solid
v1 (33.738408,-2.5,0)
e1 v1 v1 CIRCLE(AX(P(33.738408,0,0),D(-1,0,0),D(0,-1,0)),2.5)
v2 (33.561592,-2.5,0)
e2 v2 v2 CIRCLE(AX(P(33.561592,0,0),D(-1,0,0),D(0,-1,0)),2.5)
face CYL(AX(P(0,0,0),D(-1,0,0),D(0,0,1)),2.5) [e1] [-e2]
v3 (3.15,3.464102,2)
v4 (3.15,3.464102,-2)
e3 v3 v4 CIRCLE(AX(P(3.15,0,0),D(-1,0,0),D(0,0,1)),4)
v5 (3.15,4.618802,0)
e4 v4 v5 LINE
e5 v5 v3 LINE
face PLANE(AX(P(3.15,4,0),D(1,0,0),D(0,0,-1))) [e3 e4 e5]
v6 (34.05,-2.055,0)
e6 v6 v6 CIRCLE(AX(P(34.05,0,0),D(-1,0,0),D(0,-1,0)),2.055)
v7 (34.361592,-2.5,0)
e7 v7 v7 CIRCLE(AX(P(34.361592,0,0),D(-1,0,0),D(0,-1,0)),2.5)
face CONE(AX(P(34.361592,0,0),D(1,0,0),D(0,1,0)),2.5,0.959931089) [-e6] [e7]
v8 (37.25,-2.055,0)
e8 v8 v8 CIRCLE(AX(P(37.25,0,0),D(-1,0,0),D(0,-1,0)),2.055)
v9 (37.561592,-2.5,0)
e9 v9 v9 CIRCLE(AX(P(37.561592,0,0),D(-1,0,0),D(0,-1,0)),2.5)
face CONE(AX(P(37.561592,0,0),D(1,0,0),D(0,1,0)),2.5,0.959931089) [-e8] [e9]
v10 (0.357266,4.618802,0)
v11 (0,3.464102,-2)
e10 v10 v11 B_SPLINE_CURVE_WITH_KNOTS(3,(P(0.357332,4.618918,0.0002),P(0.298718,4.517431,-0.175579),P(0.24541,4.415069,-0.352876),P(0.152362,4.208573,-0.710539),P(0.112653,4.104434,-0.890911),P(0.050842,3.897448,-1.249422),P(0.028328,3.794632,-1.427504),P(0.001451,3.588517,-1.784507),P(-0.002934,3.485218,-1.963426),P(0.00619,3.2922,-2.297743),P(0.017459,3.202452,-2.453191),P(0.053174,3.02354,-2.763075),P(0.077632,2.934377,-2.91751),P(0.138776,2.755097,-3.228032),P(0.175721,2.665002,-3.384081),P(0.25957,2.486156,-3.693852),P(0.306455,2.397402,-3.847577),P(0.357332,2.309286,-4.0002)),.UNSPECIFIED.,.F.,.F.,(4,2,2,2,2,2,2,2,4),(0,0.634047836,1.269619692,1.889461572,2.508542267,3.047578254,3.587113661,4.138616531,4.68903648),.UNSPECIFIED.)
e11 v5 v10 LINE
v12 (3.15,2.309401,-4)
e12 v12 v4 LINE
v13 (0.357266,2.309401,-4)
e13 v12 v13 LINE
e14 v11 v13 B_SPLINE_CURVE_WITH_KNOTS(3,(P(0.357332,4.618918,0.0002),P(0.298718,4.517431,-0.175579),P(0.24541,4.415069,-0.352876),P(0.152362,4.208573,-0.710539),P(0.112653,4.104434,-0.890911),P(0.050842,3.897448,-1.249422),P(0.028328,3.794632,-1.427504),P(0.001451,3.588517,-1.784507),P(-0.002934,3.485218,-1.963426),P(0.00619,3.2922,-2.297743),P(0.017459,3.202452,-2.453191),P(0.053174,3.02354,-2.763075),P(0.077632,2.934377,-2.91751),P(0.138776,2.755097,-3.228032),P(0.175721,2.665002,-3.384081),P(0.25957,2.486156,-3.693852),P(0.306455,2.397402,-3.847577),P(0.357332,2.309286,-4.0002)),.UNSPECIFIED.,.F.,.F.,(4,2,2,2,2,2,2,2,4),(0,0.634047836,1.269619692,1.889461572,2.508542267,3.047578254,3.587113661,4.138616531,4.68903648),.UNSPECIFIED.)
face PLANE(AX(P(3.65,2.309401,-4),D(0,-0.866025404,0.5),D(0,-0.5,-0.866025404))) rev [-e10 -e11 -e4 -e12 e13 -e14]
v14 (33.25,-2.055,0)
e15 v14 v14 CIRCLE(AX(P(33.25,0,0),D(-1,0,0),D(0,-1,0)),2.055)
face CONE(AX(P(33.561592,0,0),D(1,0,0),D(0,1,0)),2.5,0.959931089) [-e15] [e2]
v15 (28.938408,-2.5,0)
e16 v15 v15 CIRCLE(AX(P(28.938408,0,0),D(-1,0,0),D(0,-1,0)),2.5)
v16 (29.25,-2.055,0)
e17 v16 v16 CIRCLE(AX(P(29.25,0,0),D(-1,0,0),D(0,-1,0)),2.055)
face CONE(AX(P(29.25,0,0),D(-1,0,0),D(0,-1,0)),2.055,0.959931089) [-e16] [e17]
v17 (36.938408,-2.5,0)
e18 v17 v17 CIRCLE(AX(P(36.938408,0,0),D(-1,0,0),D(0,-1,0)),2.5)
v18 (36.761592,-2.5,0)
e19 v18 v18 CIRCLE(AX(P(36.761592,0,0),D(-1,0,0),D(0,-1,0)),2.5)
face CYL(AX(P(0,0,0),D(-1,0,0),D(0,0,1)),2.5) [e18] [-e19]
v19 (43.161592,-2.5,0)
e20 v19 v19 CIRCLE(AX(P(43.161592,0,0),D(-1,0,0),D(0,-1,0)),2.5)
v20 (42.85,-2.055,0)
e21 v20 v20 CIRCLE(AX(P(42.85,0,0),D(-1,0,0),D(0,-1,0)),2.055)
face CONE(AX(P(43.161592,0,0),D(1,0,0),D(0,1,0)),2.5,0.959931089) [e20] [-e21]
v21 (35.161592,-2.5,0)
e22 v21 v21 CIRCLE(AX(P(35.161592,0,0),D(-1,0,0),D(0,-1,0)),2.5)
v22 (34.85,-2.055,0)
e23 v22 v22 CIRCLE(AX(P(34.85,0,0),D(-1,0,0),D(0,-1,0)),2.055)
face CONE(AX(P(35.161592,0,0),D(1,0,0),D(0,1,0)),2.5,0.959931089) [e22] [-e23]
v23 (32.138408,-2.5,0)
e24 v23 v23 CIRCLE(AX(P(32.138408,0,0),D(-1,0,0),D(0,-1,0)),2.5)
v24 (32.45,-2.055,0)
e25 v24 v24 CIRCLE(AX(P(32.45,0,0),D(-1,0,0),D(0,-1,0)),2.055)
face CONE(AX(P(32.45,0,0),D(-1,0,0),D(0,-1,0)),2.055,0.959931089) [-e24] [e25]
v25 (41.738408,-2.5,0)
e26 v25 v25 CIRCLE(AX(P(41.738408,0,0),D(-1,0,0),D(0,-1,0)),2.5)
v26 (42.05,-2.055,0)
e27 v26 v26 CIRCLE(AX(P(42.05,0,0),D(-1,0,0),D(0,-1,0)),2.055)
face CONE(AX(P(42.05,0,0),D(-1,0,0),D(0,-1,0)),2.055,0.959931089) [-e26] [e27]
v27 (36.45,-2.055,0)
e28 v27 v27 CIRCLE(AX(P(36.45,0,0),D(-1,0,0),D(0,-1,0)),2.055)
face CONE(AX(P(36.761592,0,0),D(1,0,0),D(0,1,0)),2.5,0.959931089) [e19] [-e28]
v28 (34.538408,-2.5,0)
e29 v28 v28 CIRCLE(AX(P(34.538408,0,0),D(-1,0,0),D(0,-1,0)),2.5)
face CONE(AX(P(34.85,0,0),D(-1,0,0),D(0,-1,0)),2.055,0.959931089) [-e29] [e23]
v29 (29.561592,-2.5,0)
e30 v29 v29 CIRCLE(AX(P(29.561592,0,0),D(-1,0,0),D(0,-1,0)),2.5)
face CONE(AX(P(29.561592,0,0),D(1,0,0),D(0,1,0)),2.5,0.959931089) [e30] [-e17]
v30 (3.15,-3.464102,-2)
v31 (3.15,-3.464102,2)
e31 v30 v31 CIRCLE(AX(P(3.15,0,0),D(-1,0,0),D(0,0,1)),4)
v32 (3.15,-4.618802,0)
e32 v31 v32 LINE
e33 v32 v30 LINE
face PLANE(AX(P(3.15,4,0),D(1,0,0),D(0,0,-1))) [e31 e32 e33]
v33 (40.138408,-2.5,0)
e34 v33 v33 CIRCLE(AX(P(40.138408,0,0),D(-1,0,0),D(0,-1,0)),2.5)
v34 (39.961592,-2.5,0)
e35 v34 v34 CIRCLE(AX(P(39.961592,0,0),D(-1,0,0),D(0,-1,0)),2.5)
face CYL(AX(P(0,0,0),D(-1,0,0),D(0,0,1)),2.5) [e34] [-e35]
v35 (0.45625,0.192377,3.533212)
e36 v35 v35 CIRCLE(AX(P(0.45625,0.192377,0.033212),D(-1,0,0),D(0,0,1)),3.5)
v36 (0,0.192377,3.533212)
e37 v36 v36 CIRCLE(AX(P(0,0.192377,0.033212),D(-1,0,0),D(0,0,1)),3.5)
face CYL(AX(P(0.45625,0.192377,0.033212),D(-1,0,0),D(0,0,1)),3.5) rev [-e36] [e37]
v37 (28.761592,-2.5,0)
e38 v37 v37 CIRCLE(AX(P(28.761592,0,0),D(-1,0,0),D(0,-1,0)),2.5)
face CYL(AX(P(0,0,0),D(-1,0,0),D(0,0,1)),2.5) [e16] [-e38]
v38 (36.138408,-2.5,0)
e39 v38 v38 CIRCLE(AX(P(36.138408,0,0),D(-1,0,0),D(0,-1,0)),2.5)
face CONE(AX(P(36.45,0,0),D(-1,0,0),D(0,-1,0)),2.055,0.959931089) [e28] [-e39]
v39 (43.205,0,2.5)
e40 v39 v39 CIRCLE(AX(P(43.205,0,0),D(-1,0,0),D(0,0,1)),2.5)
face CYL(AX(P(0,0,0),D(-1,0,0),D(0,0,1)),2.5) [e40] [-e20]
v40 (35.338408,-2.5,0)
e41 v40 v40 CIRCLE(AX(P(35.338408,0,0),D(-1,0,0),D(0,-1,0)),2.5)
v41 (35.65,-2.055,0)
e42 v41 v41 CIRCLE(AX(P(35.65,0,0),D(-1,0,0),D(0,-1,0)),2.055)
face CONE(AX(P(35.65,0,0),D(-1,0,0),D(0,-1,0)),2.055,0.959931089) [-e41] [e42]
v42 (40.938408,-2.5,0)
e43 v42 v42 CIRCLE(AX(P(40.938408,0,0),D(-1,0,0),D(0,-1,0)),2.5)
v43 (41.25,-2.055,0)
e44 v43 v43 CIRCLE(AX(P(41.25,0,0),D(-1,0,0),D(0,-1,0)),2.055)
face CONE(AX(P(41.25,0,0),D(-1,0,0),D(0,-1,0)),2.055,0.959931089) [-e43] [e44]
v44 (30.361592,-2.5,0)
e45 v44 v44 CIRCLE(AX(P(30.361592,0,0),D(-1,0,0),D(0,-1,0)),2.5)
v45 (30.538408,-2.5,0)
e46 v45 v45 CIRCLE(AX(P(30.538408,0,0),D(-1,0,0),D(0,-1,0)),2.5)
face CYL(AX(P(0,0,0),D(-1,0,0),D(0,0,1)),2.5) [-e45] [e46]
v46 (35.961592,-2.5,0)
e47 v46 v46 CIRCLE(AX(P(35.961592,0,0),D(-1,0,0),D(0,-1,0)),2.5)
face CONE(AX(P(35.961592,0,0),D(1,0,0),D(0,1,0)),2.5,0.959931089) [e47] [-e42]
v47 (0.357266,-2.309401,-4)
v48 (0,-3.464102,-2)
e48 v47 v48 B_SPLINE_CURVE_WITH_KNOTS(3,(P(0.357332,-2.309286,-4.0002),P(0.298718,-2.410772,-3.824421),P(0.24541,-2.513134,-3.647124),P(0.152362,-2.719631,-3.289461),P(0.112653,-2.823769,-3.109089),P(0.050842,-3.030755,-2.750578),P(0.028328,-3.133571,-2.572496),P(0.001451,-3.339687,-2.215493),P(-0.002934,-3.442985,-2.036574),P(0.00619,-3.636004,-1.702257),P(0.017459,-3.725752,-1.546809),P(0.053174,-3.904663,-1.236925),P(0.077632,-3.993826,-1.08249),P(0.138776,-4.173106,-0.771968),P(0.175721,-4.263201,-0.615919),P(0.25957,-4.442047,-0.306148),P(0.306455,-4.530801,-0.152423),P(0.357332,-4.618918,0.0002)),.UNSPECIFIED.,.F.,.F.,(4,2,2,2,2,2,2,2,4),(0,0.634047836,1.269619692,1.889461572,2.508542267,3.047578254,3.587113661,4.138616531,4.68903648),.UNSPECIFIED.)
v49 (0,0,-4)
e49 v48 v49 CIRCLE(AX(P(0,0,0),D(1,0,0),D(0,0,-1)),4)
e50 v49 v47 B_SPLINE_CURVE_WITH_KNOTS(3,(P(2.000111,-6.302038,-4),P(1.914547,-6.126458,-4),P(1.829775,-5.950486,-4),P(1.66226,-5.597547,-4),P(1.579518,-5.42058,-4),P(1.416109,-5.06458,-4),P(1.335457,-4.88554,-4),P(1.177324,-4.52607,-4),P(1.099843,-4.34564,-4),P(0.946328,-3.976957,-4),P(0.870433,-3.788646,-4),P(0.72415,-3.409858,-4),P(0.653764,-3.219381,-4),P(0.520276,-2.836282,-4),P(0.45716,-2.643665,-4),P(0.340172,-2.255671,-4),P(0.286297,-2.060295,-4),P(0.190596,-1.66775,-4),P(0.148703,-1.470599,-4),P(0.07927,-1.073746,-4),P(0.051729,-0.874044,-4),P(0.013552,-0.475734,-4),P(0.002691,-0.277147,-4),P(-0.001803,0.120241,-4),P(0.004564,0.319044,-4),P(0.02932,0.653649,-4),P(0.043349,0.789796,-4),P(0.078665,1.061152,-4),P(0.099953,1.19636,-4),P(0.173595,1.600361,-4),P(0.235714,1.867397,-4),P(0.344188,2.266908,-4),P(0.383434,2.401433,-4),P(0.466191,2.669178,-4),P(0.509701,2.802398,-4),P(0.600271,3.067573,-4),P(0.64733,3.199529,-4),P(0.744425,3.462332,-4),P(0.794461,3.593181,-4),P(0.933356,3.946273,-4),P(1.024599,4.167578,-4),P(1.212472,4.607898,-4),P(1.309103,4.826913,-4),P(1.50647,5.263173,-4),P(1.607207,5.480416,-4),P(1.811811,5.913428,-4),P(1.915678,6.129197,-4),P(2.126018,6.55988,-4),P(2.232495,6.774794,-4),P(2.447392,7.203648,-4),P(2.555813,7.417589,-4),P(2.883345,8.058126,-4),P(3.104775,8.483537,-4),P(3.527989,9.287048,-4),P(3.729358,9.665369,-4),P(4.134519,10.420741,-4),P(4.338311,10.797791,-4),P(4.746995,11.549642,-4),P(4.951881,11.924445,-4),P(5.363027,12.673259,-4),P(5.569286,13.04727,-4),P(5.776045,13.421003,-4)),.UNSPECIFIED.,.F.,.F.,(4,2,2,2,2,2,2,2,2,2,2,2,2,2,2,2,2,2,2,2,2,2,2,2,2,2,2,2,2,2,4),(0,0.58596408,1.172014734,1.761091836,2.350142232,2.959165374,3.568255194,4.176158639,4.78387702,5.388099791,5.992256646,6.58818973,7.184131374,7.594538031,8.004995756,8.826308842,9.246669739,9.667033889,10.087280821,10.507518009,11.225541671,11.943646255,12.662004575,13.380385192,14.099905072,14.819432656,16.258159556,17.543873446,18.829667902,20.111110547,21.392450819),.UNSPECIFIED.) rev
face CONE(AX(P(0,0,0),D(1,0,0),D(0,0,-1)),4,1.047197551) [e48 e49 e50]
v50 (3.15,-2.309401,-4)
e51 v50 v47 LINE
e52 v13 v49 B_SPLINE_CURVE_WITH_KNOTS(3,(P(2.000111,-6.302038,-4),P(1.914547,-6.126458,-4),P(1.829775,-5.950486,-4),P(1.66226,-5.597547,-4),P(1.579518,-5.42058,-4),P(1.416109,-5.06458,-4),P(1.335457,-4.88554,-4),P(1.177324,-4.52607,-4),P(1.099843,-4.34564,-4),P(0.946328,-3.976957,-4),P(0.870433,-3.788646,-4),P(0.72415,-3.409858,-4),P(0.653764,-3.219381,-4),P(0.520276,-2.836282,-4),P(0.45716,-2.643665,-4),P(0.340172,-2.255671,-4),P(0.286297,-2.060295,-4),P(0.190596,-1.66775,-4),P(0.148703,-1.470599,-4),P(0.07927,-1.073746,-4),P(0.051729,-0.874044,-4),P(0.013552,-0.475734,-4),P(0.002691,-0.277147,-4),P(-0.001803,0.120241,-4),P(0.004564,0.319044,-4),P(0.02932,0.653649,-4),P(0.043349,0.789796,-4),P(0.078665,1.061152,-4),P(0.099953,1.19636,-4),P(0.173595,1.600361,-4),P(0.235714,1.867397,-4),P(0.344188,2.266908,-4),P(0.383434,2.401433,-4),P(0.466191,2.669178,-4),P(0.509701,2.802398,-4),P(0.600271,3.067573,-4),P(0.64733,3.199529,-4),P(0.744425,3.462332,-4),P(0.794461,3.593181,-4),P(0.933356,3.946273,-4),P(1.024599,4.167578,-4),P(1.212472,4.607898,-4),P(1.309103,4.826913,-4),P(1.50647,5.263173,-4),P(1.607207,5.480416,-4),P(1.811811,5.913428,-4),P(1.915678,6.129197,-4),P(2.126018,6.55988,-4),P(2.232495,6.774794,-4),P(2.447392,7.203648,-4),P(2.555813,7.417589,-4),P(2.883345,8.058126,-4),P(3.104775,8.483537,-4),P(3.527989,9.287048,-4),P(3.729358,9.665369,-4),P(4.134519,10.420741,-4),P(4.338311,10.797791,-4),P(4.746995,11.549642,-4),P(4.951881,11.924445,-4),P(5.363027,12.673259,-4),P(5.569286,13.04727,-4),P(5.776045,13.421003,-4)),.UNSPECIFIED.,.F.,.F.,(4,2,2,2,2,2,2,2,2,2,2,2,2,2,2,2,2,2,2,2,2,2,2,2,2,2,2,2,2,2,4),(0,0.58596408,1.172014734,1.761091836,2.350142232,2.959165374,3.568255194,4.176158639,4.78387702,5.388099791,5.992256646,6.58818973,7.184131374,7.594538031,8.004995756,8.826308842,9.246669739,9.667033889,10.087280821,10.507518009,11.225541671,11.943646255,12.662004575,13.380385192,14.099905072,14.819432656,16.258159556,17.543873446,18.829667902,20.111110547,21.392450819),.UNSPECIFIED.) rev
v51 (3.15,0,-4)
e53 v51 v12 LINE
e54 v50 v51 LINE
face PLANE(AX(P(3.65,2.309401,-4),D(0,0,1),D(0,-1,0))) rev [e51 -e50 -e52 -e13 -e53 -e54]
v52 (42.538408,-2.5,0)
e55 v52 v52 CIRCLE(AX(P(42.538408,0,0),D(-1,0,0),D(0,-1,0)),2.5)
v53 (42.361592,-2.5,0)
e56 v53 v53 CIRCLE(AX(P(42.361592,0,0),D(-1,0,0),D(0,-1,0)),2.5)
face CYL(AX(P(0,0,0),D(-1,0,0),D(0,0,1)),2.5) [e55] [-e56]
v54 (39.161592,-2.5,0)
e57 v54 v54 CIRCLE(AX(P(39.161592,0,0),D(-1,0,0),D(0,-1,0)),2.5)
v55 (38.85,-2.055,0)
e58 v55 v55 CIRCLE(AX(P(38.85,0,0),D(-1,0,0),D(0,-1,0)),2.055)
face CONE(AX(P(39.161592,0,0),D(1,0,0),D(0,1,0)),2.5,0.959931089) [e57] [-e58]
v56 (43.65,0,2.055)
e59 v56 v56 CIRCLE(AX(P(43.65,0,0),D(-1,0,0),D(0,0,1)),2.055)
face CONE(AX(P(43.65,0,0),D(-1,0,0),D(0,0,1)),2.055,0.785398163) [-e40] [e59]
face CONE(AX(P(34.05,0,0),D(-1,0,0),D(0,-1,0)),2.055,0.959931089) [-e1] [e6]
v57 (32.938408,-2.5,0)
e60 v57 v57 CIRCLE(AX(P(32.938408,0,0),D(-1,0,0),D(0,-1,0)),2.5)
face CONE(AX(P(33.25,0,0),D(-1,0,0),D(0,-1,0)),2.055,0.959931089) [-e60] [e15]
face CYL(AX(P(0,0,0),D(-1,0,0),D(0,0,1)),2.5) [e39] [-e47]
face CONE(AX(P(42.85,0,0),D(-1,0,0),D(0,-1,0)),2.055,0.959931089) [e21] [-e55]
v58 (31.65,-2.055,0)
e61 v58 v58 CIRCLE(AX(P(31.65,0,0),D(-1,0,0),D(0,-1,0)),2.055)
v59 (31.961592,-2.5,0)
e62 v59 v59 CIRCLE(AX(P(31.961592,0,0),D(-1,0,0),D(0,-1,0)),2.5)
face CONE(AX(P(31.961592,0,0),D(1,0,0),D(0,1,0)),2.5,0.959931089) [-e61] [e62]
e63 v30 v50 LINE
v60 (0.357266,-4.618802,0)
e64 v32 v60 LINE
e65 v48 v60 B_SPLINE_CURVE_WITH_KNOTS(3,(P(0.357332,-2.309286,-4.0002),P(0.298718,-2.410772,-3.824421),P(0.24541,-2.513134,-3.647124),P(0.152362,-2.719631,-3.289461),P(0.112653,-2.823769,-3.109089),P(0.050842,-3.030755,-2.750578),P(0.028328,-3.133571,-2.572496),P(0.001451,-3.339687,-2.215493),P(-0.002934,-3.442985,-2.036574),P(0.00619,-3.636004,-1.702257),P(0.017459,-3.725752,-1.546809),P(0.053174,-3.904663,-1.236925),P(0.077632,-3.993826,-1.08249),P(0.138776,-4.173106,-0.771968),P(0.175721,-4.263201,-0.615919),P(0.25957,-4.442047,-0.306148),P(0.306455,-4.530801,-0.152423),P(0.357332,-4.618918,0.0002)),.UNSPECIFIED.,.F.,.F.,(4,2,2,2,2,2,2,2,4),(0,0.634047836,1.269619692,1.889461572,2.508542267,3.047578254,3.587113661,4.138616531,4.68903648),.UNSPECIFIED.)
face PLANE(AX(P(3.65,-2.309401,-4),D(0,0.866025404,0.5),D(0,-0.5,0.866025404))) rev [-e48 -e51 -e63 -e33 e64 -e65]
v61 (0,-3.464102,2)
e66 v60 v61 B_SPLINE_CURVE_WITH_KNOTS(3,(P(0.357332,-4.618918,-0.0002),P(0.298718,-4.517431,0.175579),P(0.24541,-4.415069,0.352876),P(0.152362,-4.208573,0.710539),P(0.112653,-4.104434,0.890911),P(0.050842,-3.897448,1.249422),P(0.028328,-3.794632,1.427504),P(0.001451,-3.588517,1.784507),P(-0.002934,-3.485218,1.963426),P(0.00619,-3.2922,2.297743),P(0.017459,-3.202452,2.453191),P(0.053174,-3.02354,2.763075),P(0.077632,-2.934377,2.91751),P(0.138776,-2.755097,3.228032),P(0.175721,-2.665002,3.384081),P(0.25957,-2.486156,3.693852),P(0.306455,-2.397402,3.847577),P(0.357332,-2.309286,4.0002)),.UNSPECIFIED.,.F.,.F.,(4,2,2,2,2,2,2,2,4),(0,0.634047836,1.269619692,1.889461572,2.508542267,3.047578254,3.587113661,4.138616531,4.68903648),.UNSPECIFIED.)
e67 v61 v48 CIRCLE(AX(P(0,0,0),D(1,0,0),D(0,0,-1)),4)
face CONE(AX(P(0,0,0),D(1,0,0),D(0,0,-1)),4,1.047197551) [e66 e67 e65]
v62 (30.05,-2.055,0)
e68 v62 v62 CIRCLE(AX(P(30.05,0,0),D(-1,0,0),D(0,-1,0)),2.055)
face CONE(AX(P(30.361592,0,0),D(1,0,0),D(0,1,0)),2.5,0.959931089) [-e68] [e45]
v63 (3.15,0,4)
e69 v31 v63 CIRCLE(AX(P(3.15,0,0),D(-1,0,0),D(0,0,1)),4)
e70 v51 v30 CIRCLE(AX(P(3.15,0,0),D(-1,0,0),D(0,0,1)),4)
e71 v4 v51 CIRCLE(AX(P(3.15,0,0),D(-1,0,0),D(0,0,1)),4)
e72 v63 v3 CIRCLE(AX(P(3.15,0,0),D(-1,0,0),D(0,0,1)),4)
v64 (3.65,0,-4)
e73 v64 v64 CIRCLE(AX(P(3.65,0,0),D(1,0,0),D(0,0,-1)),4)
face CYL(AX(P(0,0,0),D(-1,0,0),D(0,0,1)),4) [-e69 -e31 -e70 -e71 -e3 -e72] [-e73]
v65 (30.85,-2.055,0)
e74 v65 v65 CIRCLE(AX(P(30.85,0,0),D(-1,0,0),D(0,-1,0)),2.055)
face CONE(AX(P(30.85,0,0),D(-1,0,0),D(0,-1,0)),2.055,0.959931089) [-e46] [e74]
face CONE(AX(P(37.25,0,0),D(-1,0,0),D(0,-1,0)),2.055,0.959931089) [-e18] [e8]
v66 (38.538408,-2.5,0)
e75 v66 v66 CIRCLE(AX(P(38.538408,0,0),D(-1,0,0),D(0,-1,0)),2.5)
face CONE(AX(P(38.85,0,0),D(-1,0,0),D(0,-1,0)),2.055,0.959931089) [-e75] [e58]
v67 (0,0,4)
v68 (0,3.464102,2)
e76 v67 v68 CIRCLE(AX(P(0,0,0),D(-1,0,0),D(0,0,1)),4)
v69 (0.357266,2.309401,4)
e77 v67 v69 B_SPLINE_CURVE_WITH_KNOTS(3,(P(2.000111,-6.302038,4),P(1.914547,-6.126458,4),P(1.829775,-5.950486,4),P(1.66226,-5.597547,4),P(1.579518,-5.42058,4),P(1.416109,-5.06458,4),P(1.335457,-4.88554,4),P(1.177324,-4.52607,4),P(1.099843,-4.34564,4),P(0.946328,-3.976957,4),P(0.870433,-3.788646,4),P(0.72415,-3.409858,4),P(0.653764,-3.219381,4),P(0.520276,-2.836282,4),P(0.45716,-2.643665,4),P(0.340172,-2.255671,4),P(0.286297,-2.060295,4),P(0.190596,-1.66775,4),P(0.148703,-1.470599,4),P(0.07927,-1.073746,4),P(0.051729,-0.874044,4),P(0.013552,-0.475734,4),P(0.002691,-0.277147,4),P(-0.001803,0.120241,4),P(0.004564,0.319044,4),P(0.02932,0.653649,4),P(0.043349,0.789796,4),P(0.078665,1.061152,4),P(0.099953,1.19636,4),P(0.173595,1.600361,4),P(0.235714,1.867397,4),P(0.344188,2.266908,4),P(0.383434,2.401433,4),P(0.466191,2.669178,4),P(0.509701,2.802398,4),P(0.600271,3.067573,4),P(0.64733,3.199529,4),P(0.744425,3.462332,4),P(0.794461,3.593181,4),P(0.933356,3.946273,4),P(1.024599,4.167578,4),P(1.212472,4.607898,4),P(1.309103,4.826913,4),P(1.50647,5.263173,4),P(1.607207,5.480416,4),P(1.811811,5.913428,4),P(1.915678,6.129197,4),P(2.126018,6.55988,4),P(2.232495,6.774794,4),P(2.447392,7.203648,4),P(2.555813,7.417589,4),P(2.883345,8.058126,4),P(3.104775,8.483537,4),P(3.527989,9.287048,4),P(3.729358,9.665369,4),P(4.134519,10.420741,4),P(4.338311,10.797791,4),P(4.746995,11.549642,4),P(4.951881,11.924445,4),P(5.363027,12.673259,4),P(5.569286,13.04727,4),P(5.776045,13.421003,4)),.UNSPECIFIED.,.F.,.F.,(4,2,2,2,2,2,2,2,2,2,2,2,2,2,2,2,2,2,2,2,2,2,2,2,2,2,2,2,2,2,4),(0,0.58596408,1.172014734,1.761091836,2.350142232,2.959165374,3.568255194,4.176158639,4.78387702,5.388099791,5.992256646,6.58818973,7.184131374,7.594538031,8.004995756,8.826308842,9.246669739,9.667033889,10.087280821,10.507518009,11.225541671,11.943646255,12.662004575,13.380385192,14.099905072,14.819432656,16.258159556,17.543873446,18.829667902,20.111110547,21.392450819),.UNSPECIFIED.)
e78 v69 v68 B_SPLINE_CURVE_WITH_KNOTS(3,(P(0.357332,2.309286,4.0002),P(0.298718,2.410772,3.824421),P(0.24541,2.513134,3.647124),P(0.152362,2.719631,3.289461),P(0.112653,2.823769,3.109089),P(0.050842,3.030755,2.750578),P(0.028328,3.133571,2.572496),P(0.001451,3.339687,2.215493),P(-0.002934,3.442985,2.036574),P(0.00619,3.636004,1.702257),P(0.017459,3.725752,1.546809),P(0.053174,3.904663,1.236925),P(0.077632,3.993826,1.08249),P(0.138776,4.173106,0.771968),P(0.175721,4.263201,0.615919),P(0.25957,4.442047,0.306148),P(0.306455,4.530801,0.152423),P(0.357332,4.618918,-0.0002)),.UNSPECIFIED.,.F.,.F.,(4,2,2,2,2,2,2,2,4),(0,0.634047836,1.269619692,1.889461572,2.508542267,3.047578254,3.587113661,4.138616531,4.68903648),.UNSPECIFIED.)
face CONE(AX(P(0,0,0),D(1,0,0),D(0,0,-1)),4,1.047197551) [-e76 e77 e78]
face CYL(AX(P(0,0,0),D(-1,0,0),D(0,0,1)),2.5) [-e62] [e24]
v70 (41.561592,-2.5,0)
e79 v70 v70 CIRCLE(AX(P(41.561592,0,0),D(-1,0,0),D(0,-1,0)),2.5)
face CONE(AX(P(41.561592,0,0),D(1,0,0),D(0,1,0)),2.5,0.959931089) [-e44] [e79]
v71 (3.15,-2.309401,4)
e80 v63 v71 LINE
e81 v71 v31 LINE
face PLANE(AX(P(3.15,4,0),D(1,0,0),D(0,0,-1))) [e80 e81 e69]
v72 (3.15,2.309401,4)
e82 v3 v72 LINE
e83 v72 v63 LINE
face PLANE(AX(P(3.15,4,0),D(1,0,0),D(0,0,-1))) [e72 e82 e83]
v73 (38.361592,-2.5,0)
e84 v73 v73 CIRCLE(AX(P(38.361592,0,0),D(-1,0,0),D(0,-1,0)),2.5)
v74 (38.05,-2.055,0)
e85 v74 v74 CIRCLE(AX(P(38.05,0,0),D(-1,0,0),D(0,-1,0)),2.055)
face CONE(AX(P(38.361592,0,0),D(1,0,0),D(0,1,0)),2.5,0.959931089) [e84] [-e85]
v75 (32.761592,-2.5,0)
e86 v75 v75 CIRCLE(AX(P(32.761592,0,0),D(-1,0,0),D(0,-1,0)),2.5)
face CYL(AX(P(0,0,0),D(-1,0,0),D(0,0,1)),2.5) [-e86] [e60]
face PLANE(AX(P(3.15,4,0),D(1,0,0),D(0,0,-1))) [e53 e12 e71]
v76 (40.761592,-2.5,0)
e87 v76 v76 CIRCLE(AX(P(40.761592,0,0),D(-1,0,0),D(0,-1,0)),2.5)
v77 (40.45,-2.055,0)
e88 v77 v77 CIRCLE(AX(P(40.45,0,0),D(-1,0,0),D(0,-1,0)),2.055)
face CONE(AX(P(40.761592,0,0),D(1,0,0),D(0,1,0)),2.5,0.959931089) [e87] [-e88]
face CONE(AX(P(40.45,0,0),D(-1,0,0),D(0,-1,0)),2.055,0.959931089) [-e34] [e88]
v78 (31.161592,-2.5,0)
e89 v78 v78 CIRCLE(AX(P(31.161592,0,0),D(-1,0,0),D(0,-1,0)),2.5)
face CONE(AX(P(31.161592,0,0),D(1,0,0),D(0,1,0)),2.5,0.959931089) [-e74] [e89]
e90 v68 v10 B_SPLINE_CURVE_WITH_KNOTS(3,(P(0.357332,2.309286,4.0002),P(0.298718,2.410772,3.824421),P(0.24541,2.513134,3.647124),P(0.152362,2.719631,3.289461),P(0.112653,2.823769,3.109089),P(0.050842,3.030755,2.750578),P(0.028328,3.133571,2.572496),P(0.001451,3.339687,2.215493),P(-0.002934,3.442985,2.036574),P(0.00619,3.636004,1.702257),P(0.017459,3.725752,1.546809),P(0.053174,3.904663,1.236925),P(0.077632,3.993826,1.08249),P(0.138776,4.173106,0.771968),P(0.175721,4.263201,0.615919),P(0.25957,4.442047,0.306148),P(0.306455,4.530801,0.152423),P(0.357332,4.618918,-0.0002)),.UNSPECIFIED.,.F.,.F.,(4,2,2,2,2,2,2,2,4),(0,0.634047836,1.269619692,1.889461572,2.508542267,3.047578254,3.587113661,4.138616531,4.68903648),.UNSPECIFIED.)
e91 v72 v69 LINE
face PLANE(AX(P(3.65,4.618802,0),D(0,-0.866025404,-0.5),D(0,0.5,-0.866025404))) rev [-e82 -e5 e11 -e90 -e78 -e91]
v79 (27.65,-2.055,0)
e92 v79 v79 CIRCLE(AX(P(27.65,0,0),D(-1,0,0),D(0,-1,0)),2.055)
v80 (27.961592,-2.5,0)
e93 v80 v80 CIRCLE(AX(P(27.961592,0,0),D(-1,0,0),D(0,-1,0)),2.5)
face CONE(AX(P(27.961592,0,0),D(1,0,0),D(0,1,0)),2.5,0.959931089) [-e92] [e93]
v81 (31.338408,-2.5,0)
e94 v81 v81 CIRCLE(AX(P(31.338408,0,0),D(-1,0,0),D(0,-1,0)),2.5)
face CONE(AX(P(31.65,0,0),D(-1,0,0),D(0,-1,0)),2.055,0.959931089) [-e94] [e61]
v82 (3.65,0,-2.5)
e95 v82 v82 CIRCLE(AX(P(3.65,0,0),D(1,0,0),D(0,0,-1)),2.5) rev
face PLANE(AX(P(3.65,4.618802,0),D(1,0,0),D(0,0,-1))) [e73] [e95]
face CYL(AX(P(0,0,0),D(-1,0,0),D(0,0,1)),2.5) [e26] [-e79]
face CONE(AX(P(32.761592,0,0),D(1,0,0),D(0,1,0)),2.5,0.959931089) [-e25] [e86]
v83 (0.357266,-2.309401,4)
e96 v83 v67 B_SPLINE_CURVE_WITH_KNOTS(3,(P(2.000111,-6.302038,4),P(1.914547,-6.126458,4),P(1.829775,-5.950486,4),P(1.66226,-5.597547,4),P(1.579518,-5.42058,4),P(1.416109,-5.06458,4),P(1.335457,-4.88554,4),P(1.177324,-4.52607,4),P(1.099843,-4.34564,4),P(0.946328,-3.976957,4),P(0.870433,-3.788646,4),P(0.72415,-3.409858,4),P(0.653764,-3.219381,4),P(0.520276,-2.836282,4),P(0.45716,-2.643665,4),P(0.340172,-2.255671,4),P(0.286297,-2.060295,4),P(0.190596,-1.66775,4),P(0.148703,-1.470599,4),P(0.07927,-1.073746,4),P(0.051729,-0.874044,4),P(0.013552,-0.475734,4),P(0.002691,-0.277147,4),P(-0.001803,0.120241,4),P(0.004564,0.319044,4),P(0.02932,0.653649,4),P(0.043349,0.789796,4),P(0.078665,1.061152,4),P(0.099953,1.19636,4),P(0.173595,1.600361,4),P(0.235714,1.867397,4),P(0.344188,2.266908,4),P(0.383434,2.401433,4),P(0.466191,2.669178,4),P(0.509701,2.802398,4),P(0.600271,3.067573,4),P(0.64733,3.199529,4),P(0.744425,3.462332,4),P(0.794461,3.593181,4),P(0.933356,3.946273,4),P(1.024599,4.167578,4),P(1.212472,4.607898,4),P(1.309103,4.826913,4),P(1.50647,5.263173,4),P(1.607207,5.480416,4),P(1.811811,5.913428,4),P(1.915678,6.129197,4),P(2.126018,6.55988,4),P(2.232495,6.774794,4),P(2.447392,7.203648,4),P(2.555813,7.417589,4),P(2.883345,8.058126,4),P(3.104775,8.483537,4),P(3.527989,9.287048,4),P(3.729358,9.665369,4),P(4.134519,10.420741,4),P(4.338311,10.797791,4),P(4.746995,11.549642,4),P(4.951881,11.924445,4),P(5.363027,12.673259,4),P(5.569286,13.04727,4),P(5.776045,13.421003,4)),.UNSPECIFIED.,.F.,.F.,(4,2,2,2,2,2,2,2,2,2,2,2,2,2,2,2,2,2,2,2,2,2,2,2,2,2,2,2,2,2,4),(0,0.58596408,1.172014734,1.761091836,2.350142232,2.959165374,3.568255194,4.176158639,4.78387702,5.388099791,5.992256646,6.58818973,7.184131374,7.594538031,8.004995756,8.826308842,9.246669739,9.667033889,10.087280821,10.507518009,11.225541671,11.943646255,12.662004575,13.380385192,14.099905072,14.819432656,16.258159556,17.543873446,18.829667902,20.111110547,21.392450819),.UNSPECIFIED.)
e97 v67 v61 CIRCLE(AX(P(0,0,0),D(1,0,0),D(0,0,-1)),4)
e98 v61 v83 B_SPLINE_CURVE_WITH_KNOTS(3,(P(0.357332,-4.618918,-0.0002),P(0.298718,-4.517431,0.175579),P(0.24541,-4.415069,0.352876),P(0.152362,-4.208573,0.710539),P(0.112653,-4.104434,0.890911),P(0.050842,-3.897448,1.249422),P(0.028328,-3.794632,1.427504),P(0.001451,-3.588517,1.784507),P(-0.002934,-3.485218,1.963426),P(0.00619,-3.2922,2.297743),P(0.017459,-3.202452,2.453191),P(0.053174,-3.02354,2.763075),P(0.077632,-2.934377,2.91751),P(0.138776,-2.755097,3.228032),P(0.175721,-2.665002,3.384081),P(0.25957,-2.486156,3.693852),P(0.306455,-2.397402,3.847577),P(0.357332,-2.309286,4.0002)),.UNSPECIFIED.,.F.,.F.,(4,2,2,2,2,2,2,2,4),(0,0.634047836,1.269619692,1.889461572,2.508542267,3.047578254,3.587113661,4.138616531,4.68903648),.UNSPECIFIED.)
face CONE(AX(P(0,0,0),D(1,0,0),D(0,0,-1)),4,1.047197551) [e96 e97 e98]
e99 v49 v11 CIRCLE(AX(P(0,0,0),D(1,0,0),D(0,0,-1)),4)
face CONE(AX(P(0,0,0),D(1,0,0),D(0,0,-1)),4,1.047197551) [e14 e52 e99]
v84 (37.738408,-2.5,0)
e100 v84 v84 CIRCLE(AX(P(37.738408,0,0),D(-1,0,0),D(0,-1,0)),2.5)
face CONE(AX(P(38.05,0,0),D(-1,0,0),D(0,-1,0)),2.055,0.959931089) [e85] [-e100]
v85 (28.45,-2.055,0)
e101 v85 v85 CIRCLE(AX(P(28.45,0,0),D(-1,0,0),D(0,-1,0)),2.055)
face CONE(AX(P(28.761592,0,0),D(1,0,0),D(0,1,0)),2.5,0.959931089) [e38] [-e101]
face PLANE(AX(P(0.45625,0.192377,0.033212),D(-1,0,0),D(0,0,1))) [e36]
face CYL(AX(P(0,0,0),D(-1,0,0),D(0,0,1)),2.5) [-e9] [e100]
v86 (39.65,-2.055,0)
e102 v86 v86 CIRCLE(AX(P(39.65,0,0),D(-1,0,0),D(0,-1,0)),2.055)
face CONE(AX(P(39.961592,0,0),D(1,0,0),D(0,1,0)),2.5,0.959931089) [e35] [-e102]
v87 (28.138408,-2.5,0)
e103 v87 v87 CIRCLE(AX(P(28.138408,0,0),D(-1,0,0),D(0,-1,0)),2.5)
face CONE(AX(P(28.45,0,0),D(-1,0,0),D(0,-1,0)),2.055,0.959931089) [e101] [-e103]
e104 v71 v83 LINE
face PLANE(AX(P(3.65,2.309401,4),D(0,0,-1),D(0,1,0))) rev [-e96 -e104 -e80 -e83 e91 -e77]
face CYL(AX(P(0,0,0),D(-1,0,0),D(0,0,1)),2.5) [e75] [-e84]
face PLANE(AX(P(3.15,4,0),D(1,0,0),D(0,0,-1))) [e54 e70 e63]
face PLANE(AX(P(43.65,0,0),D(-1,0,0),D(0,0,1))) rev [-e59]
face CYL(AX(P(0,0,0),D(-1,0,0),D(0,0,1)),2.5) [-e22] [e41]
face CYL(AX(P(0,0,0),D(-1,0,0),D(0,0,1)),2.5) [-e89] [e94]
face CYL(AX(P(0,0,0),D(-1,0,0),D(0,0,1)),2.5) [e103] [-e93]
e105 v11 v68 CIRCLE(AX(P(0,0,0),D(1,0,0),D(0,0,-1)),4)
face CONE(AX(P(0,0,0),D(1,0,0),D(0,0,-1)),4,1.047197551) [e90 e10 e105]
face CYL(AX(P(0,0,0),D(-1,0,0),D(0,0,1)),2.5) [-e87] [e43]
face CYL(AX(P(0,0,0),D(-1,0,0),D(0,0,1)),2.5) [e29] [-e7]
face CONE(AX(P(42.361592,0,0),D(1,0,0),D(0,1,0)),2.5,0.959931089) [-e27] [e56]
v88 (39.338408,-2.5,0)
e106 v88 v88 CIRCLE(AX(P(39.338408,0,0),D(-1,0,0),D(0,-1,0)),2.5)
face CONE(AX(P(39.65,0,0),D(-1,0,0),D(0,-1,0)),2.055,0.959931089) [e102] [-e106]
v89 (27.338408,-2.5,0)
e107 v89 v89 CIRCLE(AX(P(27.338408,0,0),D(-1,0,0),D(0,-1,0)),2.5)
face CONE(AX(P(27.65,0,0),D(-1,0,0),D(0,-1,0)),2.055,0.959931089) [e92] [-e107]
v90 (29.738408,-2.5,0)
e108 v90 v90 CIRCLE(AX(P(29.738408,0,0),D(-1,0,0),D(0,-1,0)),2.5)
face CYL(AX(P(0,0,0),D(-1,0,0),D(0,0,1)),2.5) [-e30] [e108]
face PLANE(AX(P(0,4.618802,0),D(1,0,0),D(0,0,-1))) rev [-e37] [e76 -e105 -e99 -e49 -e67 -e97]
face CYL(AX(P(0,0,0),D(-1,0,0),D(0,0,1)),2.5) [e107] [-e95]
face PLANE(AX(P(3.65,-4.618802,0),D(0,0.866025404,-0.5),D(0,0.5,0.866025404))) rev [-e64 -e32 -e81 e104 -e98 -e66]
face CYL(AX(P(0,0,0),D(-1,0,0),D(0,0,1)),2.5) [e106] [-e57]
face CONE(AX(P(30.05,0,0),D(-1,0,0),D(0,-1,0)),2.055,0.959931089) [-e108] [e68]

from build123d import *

# Parameters (mm, degrees)
BASEHEAD_DEPTH     = 3.65
INDENT_START       = -0.45625
INDENT_2_OUTLINE_R = 3.5
INDENT_2_DEPTH     = 0.45625
SKETCH4_W          = 0.5
SKETCH4_H          = 10.618802154
THDSCHPAT_COUNT    = 20
THDSCHPAT_PITCH    = 0.8


# Read off the part's stored shape, not the designer's step: Indent
with BuildPart() as part:
    # Sketch1 → BaseHead (new body)
    with BuildSketch(Plane(origin=(0, 0, 0), x_dir=(0, 0, -1), z_dir=(1, 0, 0))):
        Polygon((4, 2.309401077), (4, -2.309401077), (0, -4.618802154), (-4, -2.309401077), (-4, 2.309401077), (0, 4.618802154), align=None)
    extrude(amount=BASEHEAD_DEPTH)

    # Indent outline → Indent (revolve)
    with BuildSketch(Plane.YX):
        Polygon((2.5, 3.65), (2.5, 43.205), (2.055, 43.65), (0, 43.65), (0, 3.65), align=None)
    revolve(axis=Axis((0, 0, 0), (1, 0, 0)))

    # Indent 2 outline → Indent 2 (cut)
    with BuildSketch(Plane.ZY.offset(INDENT_START)):
        with Locations((0.033212245, 0.192376607)):
            Circle(INDENT_2_OUTLINE_R)
    extrude(amount=INDENT_2_DEPTH, mode=Mode.SUBTRACT)

    # Sketch3 → HeadChamfer (revolve, cut)
    with BuildSketch(Plane.XY, mode=Mode.PRIVATE) as headchamfer_sk:
        Polygon((0, 4), (3.244016936, 9.618802154), (3.244016936, 14.618802154), (-10, 14.618802154), (-10, 4), align=None)
    revolve(headchamfer_sk.sketch.rotate(Axis((0, 0, 0), (1, 0, 0)), 90), axis=Axis((0, 0, 0), (1, 0, 0)), mode=Mode.SUBTRACT)

    # Sketch4 → BearingFace (revolve, cut)
    with BuildSketch(Plane.XY, mode=Mode.PRIVATE) as bearingface_sk:
        with Locations((3.4, 9.309401077)):
            Rectangle(SKETCH4_W, SKETCH4_H)
    revolve(bearingface_sk.sketch.rotate(Axis((0, 0, 0), (1, 0, 0)), 90), axis=Axis((0, 0, 0), (1, 0, 0)), mode=Mode.SUBTRACT)

    # ThdSchSke → ThreadSchematic (revolve, cut)
    with BuildSketch(Plane.XY):
        Polygon((27.65, -2.055), (27.338407645, -2.5), (27.338407645, -3.125), (27.961592355, -3.125), (27.961592355, -2.5), align=None)
    threadschematic = revolve(axis=Axis((-3.175, 0, 0), (1, 0, 0)), mode=Mode.SUBTRACT)

    # ThdSchPat: ThreadSchematic ×20
    with Locations(*[(i * THDSCHPAT_PITCH, 0, 0) for i in range(1, THDSCHPAT_COUNT)]):
        add(threadschematic, mode=Mode.SUBTRACT)


solid = part.part
